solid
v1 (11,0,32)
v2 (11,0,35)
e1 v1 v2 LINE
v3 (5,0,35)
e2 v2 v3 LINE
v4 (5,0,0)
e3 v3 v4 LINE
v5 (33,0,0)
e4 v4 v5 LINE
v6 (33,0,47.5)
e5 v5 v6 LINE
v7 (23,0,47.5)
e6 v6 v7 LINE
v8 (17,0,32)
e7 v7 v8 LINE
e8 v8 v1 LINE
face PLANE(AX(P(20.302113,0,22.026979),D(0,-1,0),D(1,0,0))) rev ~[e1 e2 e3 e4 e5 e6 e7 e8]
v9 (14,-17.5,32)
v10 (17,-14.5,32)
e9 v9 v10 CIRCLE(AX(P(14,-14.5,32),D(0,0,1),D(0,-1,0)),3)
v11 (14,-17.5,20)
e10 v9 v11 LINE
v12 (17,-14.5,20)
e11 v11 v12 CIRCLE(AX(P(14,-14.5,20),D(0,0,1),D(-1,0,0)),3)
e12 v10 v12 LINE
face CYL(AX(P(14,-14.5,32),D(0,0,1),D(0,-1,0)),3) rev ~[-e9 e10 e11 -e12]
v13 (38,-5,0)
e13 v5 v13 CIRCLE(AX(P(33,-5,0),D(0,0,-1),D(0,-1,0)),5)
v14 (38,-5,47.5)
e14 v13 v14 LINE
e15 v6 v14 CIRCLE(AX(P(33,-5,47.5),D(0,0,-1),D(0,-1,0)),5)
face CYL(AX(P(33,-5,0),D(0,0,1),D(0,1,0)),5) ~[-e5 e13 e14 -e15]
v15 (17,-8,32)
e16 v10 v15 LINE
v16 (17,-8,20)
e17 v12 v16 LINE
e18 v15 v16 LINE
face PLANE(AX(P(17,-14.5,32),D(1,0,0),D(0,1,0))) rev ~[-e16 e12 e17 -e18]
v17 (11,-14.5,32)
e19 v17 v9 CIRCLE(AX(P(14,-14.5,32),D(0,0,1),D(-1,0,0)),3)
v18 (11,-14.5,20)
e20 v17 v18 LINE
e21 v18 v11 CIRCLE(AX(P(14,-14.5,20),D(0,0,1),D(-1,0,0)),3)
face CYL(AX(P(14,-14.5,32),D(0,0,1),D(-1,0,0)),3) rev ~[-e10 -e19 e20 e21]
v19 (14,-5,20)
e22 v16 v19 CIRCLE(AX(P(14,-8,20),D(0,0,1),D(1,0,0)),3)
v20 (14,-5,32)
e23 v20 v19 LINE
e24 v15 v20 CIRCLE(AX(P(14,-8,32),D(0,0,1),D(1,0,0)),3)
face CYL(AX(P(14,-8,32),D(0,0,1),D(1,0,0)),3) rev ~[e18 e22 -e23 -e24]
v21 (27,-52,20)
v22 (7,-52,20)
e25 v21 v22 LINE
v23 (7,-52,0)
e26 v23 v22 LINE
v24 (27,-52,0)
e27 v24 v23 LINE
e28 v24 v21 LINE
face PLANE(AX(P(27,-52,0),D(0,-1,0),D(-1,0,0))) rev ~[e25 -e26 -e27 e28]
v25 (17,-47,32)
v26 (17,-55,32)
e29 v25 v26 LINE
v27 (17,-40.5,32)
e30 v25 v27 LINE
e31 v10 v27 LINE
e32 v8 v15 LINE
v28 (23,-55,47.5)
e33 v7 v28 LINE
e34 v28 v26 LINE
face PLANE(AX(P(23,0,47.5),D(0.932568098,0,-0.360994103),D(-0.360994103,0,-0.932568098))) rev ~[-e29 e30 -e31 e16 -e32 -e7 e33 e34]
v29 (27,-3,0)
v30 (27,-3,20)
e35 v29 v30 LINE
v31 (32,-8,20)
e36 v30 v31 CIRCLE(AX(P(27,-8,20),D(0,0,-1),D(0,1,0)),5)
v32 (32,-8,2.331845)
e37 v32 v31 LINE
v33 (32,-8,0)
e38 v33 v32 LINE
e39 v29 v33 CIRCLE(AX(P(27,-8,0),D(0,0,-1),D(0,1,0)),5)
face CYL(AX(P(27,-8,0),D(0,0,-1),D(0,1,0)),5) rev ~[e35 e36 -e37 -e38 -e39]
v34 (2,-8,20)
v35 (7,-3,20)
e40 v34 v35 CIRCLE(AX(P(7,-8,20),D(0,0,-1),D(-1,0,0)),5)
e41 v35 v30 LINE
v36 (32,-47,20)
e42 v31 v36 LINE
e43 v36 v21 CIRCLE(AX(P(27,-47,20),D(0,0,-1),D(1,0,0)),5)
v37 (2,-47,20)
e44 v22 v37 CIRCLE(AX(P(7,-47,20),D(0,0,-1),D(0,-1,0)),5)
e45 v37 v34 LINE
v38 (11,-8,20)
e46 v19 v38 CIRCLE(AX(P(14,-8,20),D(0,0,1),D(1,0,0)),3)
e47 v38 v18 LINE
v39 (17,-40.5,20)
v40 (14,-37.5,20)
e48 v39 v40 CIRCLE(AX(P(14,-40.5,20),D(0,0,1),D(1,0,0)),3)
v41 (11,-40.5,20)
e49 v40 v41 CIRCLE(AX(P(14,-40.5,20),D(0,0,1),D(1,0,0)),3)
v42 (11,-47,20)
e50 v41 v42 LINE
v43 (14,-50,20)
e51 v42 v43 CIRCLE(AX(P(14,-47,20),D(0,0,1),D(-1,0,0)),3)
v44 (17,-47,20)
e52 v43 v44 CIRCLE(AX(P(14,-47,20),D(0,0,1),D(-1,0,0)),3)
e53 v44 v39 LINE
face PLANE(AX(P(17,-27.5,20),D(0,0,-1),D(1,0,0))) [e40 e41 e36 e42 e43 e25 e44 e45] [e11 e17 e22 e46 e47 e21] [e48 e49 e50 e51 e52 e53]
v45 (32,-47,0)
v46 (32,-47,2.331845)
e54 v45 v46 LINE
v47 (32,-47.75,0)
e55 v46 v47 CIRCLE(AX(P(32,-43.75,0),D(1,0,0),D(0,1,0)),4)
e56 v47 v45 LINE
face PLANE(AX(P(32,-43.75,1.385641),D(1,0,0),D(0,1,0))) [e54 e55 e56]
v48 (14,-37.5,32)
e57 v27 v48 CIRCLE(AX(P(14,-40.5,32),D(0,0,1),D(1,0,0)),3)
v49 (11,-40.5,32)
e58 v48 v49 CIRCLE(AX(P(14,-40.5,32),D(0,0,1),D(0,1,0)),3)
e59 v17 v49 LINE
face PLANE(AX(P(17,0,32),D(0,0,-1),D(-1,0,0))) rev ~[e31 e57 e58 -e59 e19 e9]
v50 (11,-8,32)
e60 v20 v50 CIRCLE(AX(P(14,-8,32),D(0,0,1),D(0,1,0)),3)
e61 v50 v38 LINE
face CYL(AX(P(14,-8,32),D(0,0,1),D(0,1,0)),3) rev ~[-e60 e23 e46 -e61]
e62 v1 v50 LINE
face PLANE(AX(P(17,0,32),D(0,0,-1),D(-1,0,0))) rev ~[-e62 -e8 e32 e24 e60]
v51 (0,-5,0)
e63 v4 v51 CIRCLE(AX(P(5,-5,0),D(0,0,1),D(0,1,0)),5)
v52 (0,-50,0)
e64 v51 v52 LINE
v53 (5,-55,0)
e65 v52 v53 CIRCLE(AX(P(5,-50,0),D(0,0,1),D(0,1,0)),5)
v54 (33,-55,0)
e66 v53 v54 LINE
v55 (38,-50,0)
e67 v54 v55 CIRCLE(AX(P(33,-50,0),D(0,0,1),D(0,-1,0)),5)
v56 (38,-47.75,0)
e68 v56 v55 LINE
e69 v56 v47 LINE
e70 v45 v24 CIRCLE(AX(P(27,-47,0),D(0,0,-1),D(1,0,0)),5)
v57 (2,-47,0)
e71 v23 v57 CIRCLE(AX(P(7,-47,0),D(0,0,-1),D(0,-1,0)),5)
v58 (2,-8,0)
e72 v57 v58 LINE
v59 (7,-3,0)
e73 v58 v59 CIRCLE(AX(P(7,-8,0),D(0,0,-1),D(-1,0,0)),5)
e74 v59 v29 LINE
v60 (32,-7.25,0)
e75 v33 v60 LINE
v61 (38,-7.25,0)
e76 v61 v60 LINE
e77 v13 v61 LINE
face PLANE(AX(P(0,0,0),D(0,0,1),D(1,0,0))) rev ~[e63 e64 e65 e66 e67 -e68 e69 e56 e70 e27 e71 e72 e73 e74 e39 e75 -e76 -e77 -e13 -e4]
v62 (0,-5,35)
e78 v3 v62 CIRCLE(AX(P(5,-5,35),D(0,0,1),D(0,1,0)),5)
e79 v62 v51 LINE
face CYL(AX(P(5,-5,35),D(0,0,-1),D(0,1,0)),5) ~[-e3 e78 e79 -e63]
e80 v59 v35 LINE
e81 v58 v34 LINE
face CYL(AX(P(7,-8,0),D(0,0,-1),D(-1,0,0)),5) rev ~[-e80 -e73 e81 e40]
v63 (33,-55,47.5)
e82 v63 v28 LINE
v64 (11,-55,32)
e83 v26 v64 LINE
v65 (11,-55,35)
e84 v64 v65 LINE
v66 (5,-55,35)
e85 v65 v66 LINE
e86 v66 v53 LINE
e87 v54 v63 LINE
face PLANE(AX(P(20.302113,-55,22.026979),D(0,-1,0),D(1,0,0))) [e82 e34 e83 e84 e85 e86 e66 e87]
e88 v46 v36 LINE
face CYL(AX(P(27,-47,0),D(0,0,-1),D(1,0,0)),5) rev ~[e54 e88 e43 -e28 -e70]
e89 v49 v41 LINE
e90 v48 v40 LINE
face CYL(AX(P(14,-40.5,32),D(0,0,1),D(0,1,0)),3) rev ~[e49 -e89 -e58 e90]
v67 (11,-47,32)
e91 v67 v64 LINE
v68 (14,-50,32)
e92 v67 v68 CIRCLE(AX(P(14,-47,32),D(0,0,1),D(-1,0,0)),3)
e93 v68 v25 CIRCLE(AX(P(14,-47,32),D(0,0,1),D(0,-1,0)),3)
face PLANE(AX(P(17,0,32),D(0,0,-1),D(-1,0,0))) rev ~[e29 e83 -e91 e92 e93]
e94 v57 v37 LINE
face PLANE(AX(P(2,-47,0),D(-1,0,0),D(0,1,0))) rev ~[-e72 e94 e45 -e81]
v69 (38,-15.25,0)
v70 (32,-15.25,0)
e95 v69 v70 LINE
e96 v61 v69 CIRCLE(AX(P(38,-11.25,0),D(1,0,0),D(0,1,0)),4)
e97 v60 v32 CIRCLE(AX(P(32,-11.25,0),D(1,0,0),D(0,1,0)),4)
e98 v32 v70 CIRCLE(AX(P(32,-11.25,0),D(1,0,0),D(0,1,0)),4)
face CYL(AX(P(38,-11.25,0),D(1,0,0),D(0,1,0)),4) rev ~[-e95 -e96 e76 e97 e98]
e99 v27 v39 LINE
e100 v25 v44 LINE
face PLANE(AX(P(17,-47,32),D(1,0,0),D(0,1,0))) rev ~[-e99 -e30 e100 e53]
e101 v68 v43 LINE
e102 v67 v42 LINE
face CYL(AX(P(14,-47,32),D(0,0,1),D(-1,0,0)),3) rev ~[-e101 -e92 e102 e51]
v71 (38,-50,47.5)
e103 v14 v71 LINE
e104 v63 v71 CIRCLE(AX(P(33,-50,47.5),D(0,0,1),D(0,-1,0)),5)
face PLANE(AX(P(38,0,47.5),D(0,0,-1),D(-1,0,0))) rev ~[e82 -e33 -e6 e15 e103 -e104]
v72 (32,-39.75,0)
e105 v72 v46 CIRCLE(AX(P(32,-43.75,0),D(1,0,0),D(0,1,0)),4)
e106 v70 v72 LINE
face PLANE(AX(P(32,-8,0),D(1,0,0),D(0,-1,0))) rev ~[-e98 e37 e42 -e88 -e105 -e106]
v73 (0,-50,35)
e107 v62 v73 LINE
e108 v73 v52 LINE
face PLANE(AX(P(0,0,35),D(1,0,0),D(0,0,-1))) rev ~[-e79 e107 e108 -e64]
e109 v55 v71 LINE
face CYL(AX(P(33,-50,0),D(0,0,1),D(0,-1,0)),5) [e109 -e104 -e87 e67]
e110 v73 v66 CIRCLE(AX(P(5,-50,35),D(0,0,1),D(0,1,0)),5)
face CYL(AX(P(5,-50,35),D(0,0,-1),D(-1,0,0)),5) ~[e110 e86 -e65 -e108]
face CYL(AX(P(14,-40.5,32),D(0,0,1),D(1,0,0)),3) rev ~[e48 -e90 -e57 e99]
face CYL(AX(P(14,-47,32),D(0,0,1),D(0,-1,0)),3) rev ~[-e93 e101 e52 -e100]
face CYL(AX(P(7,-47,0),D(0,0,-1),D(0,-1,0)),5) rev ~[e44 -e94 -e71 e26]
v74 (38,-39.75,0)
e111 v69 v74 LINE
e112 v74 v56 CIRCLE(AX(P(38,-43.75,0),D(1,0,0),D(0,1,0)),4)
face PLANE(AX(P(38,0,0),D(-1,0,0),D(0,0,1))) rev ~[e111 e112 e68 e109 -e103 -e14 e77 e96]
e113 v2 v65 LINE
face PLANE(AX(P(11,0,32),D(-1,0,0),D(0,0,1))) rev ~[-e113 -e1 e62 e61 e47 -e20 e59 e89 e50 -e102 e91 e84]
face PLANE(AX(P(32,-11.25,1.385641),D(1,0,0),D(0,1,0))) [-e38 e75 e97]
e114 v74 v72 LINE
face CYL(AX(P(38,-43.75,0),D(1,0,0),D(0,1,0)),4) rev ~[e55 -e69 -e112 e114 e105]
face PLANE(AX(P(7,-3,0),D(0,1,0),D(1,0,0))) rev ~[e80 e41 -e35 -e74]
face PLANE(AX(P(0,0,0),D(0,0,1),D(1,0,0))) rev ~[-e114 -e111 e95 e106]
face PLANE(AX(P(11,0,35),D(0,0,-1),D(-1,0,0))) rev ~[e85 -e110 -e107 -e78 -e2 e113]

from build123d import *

# Parameters (mm, degrees)
F1_DEPTH = 55
F3_DEPTH = 32.001
F4_R     = 5
F5_R     = 5
F7_DEPTH = 20
F9_DEPTH = 6


# Not quite as in the source:
# - a feature names something its author has since deleted; it is built from what else it names


with BuildPart() as f1:
    # F0 (on Front) → F1 (new body)
    with BuildSketch(Plane.XZ):
        Polygon((0, 35), (0, 0), (38, 0), (38, 47.5), (23, 47.5), (17, 32), (11, 32), (11, 35), align=None)
    extrude(amount=F1_DEPTH)

    # F2 (on face) → F3 (cut, through all)
    with BuildSketch(Plane.XY.offset(32)):
        with BuildLine():
            ThreePointArc((14, -5), (11.8786796564, -5.8786796564), (11, -8))
            Line((11, -8), (11, -14.5))
            ThreePointArc((11, -14.5), (11.8786796564, -16.6213203436), (14, -17.5))
            ThreePointArc((14, -17.5), (16.1213203436, -16.6213203436), (17, -14.5))
            Line((17, -14.5), (17, -8))
            ThreePointArc((17, -8), (16.1213203436, -5.8786796564), (14, -5))
        make_face()
        with BuildLine():
            ThreePointArc((14, -37.5), (11.8786796564, -38.3786796564), (11, -40.5))
            Line((11, -40.5), (11, -47))
            ThreePointArc((11, -47), (11.8786796564, -49.1213203436), (14, -50))
            ThreePointArc((14, -50), (16.1213203436, -49.1213203436), (17, -47))
            Line((17, -47), (17, -40.5))
            ThreePointArc((17, -40.5), (16.1213203436, -38.3786796564), (14, -37.5))
        make_face()
    extrude(amount=-F3_DEPTH, mode=Mode.SUBTRACT)

    # F4
    f4_edges = [f1.edges().sort_by_distance(p)[0] for p in [
        (38, -55, 23.75),
        (38, 0, 23.75),
    ]]
    fillet(f4_edges, radius=F4_R)

    # F5
    f5_edges = [f1.edges().sort_by_distance(p)[0] for p in [
        (0, 0, 17.5),
        (0, -55, 17.5),
    ]]
    fillet(f5_edges, radius=F5_R)

    # F6 (on face) → F7 (cut)
    with BuildSketch(Plane(origin=(0, 0, 0), x_dir=(1, 0, 0), z_dir=(0, 0, -1))):
        with BuildLine():
            Line((27, 52), (7, 52))
            ThreePointArc((7, 52), (3.4644660941, 50.5355339059), (2, 47))
            Line((2, 47), (2, 8))
            ThreePointArc((2, 8), (3.4644660941, 4.4644660941), (7, 3))
            Line((7, 3), (27, 3))
            ThreePointArc((27, 3), (30.5355339059, 4.4644660941), (32, 8))
            Line((32, 8), (32, 47))
            ThreePointArc((32, 47), (30.5355339059, 50.5355339059), (27, 52))
        make_face()
        with BuildLine():
            ThreePointArc((17, 8), (14, 5), (11, 8))
            Line((11, 8), (11, 14.5))
            ThreePointArc((11, 14.5), (14, 17.5), (17, 14.5))
            Line((17, 14.5), (17, 8))
        make_face(mode=Mode.SUBTRACT)
        with BuildLine():
            Line((17, 47), (17, 40.5))
            ThreePointArc((17, 40.5), (14, 37.5), (11, 40.5))
            Line((11, 40.5), (11, 47))
            ThreePointArc((11, 47), (14, 50), (17, 47))
        make_face(mode=Mode.SUBTRACT)
    extrude(amount=-F7_DEPTH, mode=Mode.SUBTRACT)

    # F8 (on face) → F9 (cut)
    with BuildSketch(Plane.YZ.offset(38)):
        with BuildLine():
            Line((-47.75, 0), (-39.75, 0))
            ThreePointArc((-39.75, 0), (-43.75, 4), (-47.75, 0))
        make_face()
        with BuildLine():
            ThreePointArc((-7.25, 0), (-11.25, 4), (-15.25, 0))
            Line((-15.25, 0), (-7.25, 0))
        make_face()
    extrude(amount=-F9_DEPTH, mode=Mode.SUBTRACT)


solid = f1.part
